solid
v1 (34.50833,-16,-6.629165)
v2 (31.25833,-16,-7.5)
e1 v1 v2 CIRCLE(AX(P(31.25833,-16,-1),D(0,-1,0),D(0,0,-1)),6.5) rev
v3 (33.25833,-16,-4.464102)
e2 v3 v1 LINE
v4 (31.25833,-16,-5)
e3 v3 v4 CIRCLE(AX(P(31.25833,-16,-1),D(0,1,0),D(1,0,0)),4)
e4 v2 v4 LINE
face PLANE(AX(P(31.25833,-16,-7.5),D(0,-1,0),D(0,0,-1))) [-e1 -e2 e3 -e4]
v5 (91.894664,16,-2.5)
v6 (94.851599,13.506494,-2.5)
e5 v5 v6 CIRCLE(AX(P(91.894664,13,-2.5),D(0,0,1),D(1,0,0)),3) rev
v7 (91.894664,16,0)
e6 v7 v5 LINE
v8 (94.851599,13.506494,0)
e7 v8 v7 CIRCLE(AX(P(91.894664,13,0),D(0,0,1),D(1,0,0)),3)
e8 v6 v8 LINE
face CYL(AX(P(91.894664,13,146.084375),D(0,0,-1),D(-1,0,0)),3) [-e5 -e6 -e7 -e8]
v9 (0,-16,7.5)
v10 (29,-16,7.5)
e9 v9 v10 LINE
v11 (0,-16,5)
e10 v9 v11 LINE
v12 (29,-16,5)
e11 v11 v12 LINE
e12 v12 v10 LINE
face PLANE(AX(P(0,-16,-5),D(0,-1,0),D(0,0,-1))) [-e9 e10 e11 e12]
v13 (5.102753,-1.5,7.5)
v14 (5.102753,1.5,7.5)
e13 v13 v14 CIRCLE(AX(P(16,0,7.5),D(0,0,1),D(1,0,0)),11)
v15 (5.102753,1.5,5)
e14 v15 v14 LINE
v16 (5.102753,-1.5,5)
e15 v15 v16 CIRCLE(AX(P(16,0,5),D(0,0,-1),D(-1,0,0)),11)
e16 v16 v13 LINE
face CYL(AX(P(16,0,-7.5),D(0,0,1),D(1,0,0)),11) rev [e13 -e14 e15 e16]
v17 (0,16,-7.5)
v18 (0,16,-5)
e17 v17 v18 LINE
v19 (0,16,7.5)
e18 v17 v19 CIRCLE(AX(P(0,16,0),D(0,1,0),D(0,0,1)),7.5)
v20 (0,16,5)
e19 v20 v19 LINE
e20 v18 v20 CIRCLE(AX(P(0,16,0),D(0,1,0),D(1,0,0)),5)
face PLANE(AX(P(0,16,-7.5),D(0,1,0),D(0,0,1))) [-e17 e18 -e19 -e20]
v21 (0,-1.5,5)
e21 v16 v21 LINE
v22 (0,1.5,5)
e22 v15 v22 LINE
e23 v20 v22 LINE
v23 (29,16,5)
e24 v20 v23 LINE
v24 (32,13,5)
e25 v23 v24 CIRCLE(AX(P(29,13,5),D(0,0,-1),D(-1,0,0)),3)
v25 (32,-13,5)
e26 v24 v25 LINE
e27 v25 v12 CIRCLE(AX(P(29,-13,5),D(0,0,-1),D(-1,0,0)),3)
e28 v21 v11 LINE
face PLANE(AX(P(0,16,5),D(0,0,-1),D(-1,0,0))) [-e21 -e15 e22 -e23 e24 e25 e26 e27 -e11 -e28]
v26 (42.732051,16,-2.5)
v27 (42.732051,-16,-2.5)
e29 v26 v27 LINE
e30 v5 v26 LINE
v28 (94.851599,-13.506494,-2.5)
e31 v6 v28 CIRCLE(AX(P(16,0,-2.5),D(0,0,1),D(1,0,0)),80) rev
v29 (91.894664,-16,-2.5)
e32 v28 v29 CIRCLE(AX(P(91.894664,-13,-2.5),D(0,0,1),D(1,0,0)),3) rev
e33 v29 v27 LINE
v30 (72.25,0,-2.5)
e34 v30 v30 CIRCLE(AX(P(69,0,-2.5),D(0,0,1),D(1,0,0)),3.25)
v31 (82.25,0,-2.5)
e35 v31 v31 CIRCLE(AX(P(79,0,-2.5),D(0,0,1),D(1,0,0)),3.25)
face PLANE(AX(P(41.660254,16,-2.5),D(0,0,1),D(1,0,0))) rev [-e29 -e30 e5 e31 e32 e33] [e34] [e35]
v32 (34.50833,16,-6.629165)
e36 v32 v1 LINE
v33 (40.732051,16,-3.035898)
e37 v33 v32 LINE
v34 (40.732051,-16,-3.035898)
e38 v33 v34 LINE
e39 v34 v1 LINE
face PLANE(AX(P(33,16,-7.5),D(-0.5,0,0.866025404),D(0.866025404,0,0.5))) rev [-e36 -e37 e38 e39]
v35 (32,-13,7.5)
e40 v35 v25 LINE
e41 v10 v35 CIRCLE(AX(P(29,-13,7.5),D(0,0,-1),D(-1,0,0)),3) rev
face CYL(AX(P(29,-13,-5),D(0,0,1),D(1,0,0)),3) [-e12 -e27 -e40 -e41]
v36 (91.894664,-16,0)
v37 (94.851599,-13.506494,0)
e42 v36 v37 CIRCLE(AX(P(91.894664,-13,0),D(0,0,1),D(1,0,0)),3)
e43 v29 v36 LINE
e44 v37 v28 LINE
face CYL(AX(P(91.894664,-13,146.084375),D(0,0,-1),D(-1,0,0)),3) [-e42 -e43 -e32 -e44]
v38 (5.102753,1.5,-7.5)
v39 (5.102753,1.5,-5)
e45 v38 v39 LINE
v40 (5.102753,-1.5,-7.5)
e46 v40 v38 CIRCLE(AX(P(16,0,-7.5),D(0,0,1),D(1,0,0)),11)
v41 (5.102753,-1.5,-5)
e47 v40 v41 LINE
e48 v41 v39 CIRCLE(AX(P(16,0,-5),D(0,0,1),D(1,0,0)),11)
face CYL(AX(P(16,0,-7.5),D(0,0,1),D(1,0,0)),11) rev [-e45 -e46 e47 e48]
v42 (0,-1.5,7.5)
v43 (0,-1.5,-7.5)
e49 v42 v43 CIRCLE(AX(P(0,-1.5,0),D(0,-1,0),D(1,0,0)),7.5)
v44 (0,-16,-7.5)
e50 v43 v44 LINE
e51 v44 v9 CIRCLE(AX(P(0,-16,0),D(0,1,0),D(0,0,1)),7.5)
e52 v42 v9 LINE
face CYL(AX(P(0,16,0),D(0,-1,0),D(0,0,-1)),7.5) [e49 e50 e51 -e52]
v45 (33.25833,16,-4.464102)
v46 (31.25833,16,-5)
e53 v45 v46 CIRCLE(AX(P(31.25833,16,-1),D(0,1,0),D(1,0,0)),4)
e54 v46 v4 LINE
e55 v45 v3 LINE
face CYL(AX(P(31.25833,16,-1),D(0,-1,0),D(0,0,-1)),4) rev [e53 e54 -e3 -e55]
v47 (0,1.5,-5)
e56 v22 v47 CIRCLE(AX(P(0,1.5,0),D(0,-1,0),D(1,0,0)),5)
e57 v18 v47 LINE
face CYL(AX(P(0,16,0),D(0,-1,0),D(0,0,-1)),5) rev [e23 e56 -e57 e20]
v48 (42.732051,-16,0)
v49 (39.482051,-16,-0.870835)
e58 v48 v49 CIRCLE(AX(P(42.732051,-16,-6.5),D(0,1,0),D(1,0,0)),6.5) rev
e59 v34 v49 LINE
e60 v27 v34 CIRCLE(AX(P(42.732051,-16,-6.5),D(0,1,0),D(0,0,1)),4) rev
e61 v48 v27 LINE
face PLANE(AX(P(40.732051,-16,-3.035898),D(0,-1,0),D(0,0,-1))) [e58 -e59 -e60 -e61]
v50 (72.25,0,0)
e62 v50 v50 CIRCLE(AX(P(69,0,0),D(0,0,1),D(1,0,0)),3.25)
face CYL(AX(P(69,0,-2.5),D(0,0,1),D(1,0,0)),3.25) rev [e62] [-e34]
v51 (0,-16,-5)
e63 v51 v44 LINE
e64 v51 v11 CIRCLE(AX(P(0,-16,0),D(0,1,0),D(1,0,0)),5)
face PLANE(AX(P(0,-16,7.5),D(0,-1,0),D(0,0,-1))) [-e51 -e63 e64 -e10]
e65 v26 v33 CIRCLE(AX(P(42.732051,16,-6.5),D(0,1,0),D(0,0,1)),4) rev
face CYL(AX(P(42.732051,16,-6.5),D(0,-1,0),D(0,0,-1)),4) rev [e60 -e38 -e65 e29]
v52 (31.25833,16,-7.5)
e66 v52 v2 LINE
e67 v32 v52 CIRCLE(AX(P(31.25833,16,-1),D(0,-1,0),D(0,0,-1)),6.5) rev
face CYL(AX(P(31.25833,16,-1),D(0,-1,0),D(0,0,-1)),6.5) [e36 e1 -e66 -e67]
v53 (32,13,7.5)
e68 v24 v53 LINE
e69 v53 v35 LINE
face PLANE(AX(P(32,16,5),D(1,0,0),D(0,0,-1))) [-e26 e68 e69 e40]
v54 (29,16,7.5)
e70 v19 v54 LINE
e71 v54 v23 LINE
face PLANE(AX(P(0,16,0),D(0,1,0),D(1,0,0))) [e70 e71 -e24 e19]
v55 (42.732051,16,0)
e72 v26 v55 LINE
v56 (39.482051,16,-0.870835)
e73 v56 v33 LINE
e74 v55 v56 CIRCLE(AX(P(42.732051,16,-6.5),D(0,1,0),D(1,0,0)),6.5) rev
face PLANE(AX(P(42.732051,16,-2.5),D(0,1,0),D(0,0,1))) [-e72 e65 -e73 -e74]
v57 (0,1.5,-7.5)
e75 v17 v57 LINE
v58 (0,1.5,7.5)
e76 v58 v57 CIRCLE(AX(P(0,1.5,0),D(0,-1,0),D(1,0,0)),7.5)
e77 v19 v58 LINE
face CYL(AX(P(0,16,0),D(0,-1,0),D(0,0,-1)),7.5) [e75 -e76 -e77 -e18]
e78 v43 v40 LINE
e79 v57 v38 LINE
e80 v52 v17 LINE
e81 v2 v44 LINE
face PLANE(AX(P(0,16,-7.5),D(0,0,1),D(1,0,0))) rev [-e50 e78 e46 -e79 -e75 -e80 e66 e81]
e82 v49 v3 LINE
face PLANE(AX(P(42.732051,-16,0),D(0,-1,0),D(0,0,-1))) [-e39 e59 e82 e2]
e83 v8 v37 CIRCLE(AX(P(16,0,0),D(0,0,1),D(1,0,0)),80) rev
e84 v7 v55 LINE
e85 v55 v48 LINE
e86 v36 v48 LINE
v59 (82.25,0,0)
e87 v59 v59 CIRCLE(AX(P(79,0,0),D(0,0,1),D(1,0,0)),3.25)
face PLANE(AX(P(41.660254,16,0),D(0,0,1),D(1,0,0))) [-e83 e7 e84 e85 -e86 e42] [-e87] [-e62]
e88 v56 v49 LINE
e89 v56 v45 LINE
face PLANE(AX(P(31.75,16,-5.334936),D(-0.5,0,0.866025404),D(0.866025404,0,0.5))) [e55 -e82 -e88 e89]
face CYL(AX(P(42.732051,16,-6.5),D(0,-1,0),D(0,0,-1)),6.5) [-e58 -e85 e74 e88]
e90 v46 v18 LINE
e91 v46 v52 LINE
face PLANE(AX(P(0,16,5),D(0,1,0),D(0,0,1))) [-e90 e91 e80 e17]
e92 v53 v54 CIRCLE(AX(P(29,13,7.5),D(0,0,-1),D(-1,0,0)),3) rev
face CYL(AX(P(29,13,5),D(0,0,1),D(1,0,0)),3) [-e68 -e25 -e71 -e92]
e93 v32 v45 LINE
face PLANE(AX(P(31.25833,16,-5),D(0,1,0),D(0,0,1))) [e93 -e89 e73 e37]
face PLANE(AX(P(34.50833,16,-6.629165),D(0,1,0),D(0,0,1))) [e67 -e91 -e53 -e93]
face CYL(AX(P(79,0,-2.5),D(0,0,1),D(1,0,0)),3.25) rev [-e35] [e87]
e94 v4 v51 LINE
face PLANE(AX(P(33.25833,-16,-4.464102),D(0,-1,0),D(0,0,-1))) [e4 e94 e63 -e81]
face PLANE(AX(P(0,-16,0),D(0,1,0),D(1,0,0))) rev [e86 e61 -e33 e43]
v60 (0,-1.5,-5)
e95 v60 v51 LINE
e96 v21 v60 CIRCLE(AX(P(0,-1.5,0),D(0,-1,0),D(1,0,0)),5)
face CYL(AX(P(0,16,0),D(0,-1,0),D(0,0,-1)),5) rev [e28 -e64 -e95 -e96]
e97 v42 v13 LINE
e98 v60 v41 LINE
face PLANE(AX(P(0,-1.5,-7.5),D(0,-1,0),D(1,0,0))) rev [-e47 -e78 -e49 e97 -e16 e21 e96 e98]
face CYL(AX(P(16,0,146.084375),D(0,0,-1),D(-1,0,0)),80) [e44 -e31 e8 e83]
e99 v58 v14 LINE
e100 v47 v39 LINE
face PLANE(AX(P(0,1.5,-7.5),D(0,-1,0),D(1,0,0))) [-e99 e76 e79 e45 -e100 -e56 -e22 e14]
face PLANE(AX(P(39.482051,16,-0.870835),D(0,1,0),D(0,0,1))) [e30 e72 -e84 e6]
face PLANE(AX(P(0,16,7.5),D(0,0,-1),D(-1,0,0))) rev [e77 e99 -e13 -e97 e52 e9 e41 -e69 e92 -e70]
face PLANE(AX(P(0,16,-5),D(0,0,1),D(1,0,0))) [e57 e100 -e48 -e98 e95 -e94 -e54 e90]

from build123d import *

# Parameters (mm, degrees)
BASE_FLANGE1_DEPTH      = 16
CUT_EXTRUDE1_START      = -15
CUT_EXTRUDE1_DEPTH      = 15
SKETCH7_R               = 3.25
CUT_EXTRUDE2_DEPTH      = 10
CUT_EXTRUDE3_DEPTH      = 98.612755314
CUT_EXTRUDE3_DEPTH_BACK = 2.5
FILLET1_R               = 3


# Read off the part's stored shape, not the designer's step: Cut-Extrude1
# Sheet-metal steps are written as plain solids
with BuildPart() as part:
    # Sketch1 → Base-Flange1 (new, symmetric)
    with BuildSketch(Plane(origin=(0, 0, 0), x_dir=(1, 0, 0), z_dir=(0, 1, 0))):
        with BuildLine():
            Line((32, -7.5), (0, -7.5))
            ThreePointArc((0, -7.5), (-7.5, 0), (0, 7.5))
            Line((0, 7.5), (31.258330249, 7.5))
            ThreePointArc((31.258330249, 7.5), (32.940654042, 7.278517871), (34.508330249, 6.629165125))
            Line((34.508330249, 6.629165125), (40.732050808, 3.035898385))
            ThreePointArc((40.732050808, 3.035898385), (41.696774627, 2.636296695), (42.732050808, 2.5))
            Line((42.732050808, 2.5), (96, 2.5))
            Line((96, 2.5), (96, 0))
            Line((96, 0), (42.732050808, 0))
            ThreePointArc((42.732050808, 0), (41.049727014, 0.221482129), (39.482050808, 0.870834875))
            Line((39.482050808, 0.870834875), (33.258330249, 4.464101615))
            ThreePointArc((33.258330249, 4.464101615), (32.29360643, 4.863703305), (31.258330249, 5))
            Line((31.258330249, 5), (0, 5))
            ThreePointArc((0, 5), (-5, 0), (0, -5))
            Line((0, -5), (32, -5))
            Line((32, -5), (32, -7.5))
        make_face()
    extrude(amount=BASE_FLANGE1_DEPTH, both=True)

    # Cut-Extrude1 outline → Cut-Extrude1 (cut)
    with BuildSketch(Plane.XY.offset(7.5).offset(CUT_EXTRUDE1_START)):
        with BuildLine():
            Line((5.102752641, 1.5), (-7.5, 1.5))
            Line((-7.5, 1.5), (-7.5, -1.5))
            Line((-7.5, -1.5), (5.102752641, -1.5))
            ThreePointArc((5.102752641, -1.5), (27, 0), (5.102752641, 1.5))
        make_face()
    extrude(amount=CUT_EXTRUDE1_DEPTH, mode=Mode.SUBTRACT)

    # Sketch7 → Cut-Extrude2 (cut)
    with BuildSketch(Plane.XY):
        with Locations((79, 0)):
            Circle(SKETCH7_R)
        with Locations((69, 0)):
            Circle(SKETCH7_R)
    extrude(amount=-CUT_EXTRUDE2_DEPTH, mode=Mode.SUBTRACT)

    # Sketch8 → Cut-Extrude3 (cut, two sides: drawn at the far end of the back side and taken through both)
    with BuildSketch(Plane.XY.offset(-CUT_EXTRUDE3_DEPTH_BACK)):
        with BuildLine():
            Line((49.66733752, 235.064404157), (94.383671769, 16))
            ThreePointArc((94.383671769, 16), (96, 0), (94.383671769, -16))
            Line((94.383671769, -16), (49.66733752, -235.064404157))
            Line((49.66733752, -235.064404157), (496.830680013, -235.064404157))
            Line((496.830680013, -235.064404157), (496.830680013, 235.064404157))
            Line((496.830680013, 235.064404157), (49.66733752, 235.064404157))
        make_face()
    extrude(amount=CUT_EXTRUDE3_DEPTH + CUT_EXTRUDE3_DEPTH_BACK, mode=Mode.SUBTRACT)

    # Fillet1
    fillet1_edges = [part.edges().sort_by_distance(p)[0] for p in [
        (94.383671769, 16, -1.25),
        (94.383671769, -16, -1.25),
        (32, -16, 6.25),
        (32, 16, 6.25),
    ]]
    fillet(fillet1_edges, radius=FILLET1_R)


solid = part.part
